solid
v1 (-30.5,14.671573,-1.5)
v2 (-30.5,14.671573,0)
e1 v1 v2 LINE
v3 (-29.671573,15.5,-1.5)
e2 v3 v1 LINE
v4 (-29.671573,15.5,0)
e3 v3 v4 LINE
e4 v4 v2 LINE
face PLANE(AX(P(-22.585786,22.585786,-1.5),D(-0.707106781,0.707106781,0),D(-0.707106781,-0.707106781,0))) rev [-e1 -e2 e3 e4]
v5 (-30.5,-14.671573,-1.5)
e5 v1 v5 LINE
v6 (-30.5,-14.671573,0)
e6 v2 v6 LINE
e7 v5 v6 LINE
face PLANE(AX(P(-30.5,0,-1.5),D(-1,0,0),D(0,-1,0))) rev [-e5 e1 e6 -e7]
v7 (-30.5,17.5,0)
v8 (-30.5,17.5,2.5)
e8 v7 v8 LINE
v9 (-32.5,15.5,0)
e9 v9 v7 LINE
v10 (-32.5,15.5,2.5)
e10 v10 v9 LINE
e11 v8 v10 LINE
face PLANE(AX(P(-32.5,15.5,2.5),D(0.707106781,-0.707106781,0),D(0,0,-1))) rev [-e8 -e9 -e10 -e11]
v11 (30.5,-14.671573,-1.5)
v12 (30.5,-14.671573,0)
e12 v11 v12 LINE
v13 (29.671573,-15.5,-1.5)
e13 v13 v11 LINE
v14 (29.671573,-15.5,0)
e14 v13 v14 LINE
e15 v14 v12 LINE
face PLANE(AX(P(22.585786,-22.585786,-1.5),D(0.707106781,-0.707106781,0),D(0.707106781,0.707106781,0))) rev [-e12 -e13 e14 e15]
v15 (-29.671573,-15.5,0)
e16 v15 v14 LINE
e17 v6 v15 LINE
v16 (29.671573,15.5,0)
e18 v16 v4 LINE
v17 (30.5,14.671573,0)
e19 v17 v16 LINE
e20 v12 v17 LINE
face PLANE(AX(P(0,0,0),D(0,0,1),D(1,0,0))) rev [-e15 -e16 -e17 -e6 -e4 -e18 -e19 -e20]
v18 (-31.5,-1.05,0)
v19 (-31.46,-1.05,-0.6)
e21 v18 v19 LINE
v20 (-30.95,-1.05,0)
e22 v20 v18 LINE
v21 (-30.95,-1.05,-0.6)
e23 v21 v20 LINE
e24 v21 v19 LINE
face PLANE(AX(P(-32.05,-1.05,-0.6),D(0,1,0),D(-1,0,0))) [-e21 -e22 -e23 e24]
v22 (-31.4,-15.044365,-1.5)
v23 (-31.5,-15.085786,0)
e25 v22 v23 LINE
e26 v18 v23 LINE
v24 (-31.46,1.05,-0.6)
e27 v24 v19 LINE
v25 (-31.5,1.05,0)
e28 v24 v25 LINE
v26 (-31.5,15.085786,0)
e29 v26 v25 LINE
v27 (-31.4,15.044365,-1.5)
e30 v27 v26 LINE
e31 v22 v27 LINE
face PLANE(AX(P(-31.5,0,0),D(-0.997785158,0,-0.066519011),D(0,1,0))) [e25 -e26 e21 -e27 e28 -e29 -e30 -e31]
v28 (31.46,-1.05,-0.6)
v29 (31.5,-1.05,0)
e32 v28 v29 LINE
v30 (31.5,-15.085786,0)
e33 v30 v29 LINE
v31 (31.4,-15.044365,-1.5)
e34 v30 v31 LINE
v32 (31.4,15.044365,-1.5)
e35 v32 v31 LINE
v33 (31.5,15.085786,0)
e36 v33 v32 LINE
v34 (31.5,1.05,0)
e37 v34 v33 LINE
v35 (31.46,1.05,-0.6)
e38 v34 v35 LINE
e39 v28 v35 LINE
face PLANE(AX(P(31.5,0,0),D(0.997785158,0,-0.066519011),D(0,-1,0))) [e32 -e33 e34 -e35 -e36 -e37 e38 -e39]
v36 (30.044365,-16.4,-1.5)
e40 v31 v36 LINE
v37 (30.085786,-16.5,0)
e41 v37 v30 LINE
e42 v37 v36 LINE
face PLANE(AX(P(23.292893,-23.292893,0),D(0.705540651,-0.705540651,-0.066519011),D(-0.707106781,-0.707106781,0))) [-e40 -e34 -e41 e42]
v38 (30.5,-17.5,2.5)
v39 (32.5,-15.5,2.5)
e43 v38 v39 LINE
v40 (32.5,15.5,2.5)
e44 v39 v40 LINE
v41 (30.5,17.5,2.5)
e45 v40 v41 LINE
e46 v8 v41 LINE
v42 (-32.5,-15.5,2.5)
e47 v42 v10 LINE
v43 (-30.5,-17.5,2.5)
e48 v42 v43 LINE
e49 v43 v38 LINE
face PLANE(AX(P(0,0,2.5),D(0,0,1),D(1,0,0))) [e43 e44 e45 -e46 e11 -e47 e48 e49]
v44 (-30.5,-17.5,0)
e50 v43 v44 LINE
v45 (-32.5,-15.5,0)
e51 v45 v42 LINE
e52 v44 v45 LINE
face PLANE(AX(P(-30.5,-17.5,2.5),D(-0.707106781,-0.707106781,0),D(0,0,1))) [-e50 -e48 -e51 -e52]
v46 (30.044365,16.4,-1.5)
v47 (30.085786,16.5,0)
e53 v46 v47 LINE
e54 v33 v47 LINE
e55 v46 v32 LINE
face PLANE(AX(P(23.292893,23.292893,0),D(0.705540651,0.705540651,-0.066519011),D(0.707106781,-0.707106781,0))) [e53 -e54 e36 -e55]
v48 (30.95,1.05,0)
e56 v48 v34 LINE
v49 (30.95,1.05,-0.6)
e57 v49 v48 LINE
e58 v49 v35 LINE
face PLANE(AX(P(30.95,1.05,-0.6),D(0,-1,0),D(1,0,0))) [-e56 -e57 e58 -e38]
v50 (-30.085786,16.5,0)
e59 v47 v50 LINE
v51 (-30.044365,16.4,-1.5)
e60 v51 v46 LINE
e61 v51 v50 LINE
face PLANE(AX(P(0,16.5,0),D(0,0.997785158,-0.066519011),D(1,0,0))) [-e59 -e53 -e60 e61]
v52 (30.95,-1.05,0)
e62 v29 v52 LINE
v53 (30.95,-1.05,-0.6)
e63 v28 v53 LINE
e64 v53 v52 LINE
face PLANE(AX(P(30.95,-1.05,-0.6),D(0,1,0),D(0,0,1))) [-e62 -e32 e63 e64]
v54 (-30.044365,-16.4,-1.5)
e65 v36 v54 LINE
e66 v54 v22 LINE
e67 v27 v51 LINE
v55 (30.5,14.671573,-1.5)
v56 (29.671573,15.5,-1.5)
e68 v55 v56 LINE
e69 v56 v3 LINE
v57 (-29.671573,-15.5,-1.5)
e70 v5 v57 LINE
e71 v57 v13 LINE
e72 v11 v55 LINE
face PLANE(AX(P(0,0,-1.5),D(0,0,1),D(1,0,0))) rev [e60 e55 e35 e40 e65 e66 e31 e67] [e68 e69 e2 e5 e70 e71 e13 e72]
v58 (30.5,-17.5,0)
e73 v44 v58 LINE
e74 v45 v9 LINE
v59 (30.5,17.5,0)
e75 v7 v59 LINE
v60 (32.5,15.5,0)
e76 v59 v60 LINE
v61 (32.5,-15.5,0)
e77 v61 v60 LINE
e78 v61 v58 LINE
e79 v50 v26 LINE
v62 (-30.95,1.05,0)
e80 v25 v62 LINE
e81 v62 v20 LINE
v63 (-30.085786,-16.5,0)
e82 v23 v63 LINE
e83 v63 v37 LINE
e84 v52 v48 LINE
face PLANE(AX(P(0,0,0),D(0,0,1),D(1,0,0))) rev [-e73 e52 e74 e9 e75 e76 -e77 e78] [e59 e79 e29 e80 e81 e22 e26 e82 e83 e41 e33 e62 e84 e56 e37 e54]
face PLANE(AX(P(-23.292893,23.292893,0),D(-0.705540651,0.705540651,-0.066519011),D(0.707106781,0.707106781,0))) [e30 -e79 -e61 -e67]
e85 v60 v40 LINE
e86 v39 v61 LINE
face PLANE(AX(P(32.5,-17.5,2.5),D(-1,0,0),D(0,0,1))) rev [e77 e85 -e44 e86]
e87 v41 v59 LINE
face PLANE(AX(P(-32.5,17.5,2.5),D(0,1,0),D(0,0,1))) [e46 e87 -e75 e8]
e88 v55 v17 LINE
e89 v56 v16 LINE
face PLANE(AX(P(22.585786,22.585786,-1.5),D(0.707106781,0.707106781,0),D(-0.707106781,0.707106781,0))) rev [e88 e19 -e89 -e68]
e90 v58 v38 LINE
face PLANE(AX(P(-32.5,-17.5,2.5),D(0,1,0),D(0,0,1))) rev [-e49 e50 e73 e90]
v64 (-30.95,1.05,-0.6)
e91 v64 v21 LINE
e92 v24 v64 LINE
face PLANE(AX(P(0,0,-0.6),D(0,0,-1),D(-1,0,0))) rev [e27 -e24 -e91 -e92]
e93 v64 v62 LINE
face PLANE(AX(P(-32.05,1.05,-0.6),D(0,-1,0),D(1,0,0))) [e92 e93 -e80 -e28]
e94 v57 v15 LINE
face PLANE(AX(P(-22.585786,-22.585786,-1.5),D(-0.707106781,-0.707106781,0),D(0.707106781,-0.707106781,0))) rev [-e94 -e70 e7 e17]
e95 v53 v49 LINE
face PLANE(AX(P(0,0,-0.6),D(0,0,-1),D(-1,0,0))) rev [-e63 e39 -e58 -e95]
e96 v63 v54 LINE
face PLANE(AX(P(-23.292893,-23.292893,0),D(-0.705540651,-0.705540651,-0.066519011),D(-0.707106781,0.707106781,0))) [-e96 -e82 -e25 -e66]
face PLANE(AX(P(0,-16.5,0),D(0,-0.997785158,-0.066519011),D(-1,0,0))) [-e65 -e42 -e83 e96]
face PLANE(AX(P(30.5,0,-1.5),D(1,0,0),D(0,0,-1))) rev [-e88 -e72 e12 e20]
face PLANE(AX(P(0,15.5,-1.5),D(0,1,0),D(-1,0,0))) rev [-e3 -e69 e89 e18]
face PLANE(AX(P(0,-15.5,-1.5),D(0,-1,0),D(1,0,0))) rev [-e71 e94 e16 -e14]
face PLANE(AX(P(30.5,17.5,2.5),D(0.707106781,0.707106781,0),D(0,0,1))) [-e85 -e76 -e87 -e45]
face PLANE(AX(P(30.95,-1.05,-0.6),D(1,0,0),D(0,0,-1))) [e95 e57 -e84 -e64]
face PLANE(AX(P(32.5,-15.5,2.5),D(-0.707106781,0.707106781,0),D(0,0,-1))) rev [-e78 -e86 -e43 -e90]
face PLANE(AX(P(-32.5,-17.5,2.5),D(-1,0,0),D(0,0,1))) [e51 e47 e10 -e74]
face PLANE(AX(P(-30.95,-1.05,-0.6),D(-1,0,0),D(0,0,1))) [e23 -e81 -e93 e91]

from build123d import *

# Parameters (mm, degrees)
CROQUIS1_W              = 65
CROQUIS1_H              = 35
SALIENTE_EXTRUIR1_DEPTH = 2.5
CHAMFER1_SIZE           = 2
BOSS_EXTRUDE1_START     = -2.5
BOSS_EXTRUDE1_DEPTH     = 1.5
CHAMFER2_SIZE           = 1.5
CHAMFER2_SIZE_2         = 0.1
SKETCH2_W               = 1.1
SKETCH2_H               = 2.1
CUT_EXTRUDE1_DEPTH      = 0.6


with BuildPart() as part:
    # Croquis1 → Saliente-Extruir1 (new body)
    with BuildSketch(Plane.XY):
        Rectangle(CROQUIS1_W, CROQUIS1_H)
    extrude(amount=SALIENTE_EXTRUIR1_DEPTH)

    # Chamfer1
    chamfer1_edges = [part.edges().sort_by_distance(p)[0] for p in [
        (-32.5, 17.5, 1.25),
        (-32.5, -17.5, 1.25),
        (32.5, -17.5, 1.25),
        (32.5, 17.5, 1.25),
    ]]
    chamfer(chamfer1_edges, length=CHAMFER1_SIZE)

    # Sketch1 → Boss-Extrude1 (add)
    with BuildSketch(Plane.XY.offset(2.5).offset(BOSS_EXTRUDE1_START)):
        Polygon((-30.085786438, -16.5), (30.085786438, -16.5), (31.5, -15.085786438), (31.5, 15.085786438), (30.085786438, 16.5), (-30.085786438, 16.5), (-31.5, 15.085786438), (-31.5, -15.085786438), align=None)
        Polygon((-29.671572875, -15.5), (29.671572875, -15.5), (30.5, -14.671572875), (30.5, 14.671572875), (29.671572875, 15.5), (-29.671572875, 15.5), (-30.5, 14.671572875), (-30.5, -14.671572875), align=None, mode=Mode.SUBTRACT)
    extrude(amount=-BOSS_EXTRUDE1_DEPTH)

    # Chamfer2
    # the kernel refuses this chamfer: 1.5, 0.1 mm, written as the material it takes off along each edge
    with BuildSketch(Plane(origin=(34.257490553, 12.328295884, -1.5), x_dir=(0.0018092267925963327, 0.001809226792596321, 0.9999967266930556), z_dir=(-0.7071067811865454, 0.7071067811865498, 0))) as chamfer2_piece_1_section:
        Polygon((CHAMFER2_SIZE * 0.999996726693, -CHAMFER2_SIZE * 0.0025586330675), (-CHAMFER2_SIZE_2 * 0.0025586330675, -CHAMFER2_SIZE_2 * 0.999996726693), (0, 0), align=None)
    chamfer2_piece_1 = extrude(amount=9.799361077, mode=Mode.PRIVATE)
    chamfer2_piece_1 = split(chamfer2_piece_1, bisect_by=Plane(origin=(30.78142094, 15.78142094, 0), z_dir=(0, 0, -1)), keep=Keep.TOP, mode=Mode.PRIVATE)
    add(chamfer2_piece_1, mode=Mode.SUBTRACT)
    with BuildSketch(Plane(origin=(33.985466976, 16.5, -1.5), x_dir=(0, 0.0025586330674999794, 0.9999967266930556), z_dir=(-1, 0, 0))) as chamfer2_piece_2_section:
        Polygon((CHAMFER2_SIZE * 0.999996726693, -CHAMFER2_SIZE * 0.0025586330675), (-CHAMFER2_SIZE_2 * 0.0025586330675, -CHAMFER2_SIZE_2 * 0.999996726693), (0, 0), align=None)
    chamfer2_piece_2 = extrude(amount=67.970933952, mode=Mode.PRIVATE)
    chamfer2_piece_2 = split(chamfer2_piece_2, bisect_by=Plane(origin=(0, 16.483775747, 0), z_dir=(0, 0, -1)), keep=Keep.TOP, mode=Mode.PRIVATE)
    add(chamfer2_piece_2, mode=Mode.SUBTRACT)
    with BuildSketch(Plane(origin=(-27.328295884, 19.257490553, -1.5), x_dir=(-0.0018092267925980316, 0.0018092267925980384, 0.9999967266930556), z_dir=(-0.7071067811865489, -0.7071067811865462, 0))) as chamfer2_piece_3_section:
        Polygon((CHAMFER2_SIZE * 0.999996726693, -CHAMFER2_SIZE * 0.0025586330675), (-CHAMFER2_SIZE_2 * 0.0025586330675, -CHAMFER2_SIZE_2 * 0.999996726693), (0, 0), align=None)
    chamfer2_piece_3 = extrude(amount=9.799361077, mode=Mode.PRIVATE)
    chamfer2_piece_3 = split(chamfer2_piece_3, bisect_by=Plane(origin=(-30.78142094, 15.78142094, 0), z_dir=(0, 0, -1)), keep=Keep.TOP, mode=Mode.PRIVATE)
    add(chamfer2_piece_3, mode=Mode.SUBTRACT)
    with BuildSketch(Plane(origin=(-31.5, 18.985466976, -1.5), x_dir=(-0.0025586330674999794, 0, 0.9999967266930556), z_dir=(0, -1, 0))) as chamfer2_piece_4_section:
        Polygon((CHAMFER2_SIZE * 0.999996726693, -CHAMFER2_SIZE * 0.0025586330675), (-CHAMFER2_SIZE_2 * 0.0025586330675, -CHAMFER2_SIZE_2 * 0.999996726693), (0, 0), align=None)
    chamfer2_piece_4 = extrude(amount=37.970933952, mode=Mode.PRIVATE)
    chamfer2_piece_4 = split(chamfer2_piece_4, bisect_by=Plane(origin=(-31.483775747, 0, 0), z_dir=(0, 0, -1)), keep=Keep.TOP, mode=Mode.PRIVATE)
    add(chamfer2_piece_4, mode=Mode.SUBTRACT)
    with BuildSketch(Plane(origin=(-34.257490553, -12.328295884, -1.5), x_dir=(-0.0018092267925951928, -0.0018092267925951832, 0.9999967266930556), z_dir=(0.7071067811865458, -0.7071067811865493, 0))) as chamfer2_piece_5_section:
        Polygon((CHAMFER2_SIZE * 0.999996726693, -CHAMFER2_SIZE * 0.0025586330675), (-CHAMFER2_SIZE_2 * 0.0025586330675, -CHAMFER2_SIZE_2 * 0.999996726693), (0, 0), align=None)
    chamfer2_piece_5 = extrude(amount=9.799361077, mode=Mode.PRIVATE)
    chamfer2_piece_5 = split(chamfer2_piece_5, bisect_by=Plane(origin=(-30.78142094, -15.78142094, 0), z_dir=(0, 0, -1)), keep=Keep.TOP, mode=Mode.PRIVATE)
    add(chamfer2_piece_5, mode=Mode.SUBTRACT)
    with BuildSketch(Plane(origin=(31.5, -18.985466976, -1.5), x_dir=(0.0025586330674999794, 0, 0.9999967266930556), z_dir=(0, 1, 0))) as chamfer2_piece_6_section:
        Polygon((CHAMFER2_SIZE * 0.999996726693, -CHAMFER2_SIZE * 0.0025586330675), (-CHAMFER2_SIZE_2 * 0.0025586330675, -CHAMFER2_SIZE_2 * 0.999996726693), (0, 0), align=None)
    chamfer2_piece_6 = extrude(amount=37.970933952, mode=Mode.PRIVATE)
    chamfer2_piece_6 = split(chamfer2_piece_6, bisect_by=Plane(origin=(31.483775747, 0, 0), z_dir=(0, 0, -1)), keep=Keep.TOP, mode=Mode.PRIVATE)
    add(chamfer2_piece_6, mode=Mode.SUBTRACT)
    with BuildSketch(Plane(origin=(27.328295884, -19.257490553, -1.5), x_dir=(0.0018092267925980349, -0.0018092267925980349, 0.9999967266930556), z_dir=(0.7071067811865476, 0.7071067811865476, 0))) as chamfer2_piece_7_section:
        Polygon((CHAMFER2_SIZE * 0.999996726693, -CHAMFER2_SIZE * 0.0025586330675), (-CHAMFER2_SIZE_2 * 0.0025586330675, -CHAMFER2_SIZE_2 * 0.999996726693), (0, 0), align=None)
    chamfer2_piece_7 = extrude(amount=9.799361077, mode=Mode.PRIVATE)
    chamfer2_piece_7 = split(chamfer2_piece_7, bisect_by=Plane(origin=(30.78142094, -15.78142094, 0), z_dir=(0, 0, -1)), keep=Keep.TOP, mode=Mode.PRIVATE)
    add(chamfer2_piece_7, mode=Mode.SUBTRACT)
    with BuildSketch(Plane(origin=(-33.985466976, -16.5, -1.5), x_dir=(0, -0.0025586330674999794, 0.9999967266930556), z_dir=(1, 0, 0))) as chamfer2_piece_8_section:
        Polygon((CHAMFER2_SIZE * 0.999996726693, -CHAMFER2_SIZE * 0.0025586330675), (-CHAMFER2_SIZE_2 * 0.0025586330675, -CHAMFER2_SIZE_2 * 0.999996726693), (0, 0), align=None)
    chamfer2_piece_8 = extrude(amount=67.970933952, mode=Mode.PRIVATE)
    chamfer2_piece_8 = split(chamfer2_piece_8, bisect_by=Plane(origin=(0, -16.483775747, 0), z_dir=(0, 0, -1)), keep=Keep.TOP, mode=Mode.PRIVATE)
    add(chamfer2_piece_8, mode=Mode.SUBTRACT)

    # Sketch2 → Cut-Extrude1 (cut)
    with BuildSketch(Plane(origin=(0, 0, 0), x_dir=(-1, 0, 0), z_dir=(0, 0, -1))):
        with Locations((-31.5, 0)):
            Rectangle(SKETCH2_W, SKETCH2_H)
        with Locations((31.5, 0)):
            Rectangle(SKETCH2_W, SKETCH2_H)
    extrude(amount=CUT_EXTRUDE1_DEPTH, mode=Mode.SUBTRACT)


solid = part.part
